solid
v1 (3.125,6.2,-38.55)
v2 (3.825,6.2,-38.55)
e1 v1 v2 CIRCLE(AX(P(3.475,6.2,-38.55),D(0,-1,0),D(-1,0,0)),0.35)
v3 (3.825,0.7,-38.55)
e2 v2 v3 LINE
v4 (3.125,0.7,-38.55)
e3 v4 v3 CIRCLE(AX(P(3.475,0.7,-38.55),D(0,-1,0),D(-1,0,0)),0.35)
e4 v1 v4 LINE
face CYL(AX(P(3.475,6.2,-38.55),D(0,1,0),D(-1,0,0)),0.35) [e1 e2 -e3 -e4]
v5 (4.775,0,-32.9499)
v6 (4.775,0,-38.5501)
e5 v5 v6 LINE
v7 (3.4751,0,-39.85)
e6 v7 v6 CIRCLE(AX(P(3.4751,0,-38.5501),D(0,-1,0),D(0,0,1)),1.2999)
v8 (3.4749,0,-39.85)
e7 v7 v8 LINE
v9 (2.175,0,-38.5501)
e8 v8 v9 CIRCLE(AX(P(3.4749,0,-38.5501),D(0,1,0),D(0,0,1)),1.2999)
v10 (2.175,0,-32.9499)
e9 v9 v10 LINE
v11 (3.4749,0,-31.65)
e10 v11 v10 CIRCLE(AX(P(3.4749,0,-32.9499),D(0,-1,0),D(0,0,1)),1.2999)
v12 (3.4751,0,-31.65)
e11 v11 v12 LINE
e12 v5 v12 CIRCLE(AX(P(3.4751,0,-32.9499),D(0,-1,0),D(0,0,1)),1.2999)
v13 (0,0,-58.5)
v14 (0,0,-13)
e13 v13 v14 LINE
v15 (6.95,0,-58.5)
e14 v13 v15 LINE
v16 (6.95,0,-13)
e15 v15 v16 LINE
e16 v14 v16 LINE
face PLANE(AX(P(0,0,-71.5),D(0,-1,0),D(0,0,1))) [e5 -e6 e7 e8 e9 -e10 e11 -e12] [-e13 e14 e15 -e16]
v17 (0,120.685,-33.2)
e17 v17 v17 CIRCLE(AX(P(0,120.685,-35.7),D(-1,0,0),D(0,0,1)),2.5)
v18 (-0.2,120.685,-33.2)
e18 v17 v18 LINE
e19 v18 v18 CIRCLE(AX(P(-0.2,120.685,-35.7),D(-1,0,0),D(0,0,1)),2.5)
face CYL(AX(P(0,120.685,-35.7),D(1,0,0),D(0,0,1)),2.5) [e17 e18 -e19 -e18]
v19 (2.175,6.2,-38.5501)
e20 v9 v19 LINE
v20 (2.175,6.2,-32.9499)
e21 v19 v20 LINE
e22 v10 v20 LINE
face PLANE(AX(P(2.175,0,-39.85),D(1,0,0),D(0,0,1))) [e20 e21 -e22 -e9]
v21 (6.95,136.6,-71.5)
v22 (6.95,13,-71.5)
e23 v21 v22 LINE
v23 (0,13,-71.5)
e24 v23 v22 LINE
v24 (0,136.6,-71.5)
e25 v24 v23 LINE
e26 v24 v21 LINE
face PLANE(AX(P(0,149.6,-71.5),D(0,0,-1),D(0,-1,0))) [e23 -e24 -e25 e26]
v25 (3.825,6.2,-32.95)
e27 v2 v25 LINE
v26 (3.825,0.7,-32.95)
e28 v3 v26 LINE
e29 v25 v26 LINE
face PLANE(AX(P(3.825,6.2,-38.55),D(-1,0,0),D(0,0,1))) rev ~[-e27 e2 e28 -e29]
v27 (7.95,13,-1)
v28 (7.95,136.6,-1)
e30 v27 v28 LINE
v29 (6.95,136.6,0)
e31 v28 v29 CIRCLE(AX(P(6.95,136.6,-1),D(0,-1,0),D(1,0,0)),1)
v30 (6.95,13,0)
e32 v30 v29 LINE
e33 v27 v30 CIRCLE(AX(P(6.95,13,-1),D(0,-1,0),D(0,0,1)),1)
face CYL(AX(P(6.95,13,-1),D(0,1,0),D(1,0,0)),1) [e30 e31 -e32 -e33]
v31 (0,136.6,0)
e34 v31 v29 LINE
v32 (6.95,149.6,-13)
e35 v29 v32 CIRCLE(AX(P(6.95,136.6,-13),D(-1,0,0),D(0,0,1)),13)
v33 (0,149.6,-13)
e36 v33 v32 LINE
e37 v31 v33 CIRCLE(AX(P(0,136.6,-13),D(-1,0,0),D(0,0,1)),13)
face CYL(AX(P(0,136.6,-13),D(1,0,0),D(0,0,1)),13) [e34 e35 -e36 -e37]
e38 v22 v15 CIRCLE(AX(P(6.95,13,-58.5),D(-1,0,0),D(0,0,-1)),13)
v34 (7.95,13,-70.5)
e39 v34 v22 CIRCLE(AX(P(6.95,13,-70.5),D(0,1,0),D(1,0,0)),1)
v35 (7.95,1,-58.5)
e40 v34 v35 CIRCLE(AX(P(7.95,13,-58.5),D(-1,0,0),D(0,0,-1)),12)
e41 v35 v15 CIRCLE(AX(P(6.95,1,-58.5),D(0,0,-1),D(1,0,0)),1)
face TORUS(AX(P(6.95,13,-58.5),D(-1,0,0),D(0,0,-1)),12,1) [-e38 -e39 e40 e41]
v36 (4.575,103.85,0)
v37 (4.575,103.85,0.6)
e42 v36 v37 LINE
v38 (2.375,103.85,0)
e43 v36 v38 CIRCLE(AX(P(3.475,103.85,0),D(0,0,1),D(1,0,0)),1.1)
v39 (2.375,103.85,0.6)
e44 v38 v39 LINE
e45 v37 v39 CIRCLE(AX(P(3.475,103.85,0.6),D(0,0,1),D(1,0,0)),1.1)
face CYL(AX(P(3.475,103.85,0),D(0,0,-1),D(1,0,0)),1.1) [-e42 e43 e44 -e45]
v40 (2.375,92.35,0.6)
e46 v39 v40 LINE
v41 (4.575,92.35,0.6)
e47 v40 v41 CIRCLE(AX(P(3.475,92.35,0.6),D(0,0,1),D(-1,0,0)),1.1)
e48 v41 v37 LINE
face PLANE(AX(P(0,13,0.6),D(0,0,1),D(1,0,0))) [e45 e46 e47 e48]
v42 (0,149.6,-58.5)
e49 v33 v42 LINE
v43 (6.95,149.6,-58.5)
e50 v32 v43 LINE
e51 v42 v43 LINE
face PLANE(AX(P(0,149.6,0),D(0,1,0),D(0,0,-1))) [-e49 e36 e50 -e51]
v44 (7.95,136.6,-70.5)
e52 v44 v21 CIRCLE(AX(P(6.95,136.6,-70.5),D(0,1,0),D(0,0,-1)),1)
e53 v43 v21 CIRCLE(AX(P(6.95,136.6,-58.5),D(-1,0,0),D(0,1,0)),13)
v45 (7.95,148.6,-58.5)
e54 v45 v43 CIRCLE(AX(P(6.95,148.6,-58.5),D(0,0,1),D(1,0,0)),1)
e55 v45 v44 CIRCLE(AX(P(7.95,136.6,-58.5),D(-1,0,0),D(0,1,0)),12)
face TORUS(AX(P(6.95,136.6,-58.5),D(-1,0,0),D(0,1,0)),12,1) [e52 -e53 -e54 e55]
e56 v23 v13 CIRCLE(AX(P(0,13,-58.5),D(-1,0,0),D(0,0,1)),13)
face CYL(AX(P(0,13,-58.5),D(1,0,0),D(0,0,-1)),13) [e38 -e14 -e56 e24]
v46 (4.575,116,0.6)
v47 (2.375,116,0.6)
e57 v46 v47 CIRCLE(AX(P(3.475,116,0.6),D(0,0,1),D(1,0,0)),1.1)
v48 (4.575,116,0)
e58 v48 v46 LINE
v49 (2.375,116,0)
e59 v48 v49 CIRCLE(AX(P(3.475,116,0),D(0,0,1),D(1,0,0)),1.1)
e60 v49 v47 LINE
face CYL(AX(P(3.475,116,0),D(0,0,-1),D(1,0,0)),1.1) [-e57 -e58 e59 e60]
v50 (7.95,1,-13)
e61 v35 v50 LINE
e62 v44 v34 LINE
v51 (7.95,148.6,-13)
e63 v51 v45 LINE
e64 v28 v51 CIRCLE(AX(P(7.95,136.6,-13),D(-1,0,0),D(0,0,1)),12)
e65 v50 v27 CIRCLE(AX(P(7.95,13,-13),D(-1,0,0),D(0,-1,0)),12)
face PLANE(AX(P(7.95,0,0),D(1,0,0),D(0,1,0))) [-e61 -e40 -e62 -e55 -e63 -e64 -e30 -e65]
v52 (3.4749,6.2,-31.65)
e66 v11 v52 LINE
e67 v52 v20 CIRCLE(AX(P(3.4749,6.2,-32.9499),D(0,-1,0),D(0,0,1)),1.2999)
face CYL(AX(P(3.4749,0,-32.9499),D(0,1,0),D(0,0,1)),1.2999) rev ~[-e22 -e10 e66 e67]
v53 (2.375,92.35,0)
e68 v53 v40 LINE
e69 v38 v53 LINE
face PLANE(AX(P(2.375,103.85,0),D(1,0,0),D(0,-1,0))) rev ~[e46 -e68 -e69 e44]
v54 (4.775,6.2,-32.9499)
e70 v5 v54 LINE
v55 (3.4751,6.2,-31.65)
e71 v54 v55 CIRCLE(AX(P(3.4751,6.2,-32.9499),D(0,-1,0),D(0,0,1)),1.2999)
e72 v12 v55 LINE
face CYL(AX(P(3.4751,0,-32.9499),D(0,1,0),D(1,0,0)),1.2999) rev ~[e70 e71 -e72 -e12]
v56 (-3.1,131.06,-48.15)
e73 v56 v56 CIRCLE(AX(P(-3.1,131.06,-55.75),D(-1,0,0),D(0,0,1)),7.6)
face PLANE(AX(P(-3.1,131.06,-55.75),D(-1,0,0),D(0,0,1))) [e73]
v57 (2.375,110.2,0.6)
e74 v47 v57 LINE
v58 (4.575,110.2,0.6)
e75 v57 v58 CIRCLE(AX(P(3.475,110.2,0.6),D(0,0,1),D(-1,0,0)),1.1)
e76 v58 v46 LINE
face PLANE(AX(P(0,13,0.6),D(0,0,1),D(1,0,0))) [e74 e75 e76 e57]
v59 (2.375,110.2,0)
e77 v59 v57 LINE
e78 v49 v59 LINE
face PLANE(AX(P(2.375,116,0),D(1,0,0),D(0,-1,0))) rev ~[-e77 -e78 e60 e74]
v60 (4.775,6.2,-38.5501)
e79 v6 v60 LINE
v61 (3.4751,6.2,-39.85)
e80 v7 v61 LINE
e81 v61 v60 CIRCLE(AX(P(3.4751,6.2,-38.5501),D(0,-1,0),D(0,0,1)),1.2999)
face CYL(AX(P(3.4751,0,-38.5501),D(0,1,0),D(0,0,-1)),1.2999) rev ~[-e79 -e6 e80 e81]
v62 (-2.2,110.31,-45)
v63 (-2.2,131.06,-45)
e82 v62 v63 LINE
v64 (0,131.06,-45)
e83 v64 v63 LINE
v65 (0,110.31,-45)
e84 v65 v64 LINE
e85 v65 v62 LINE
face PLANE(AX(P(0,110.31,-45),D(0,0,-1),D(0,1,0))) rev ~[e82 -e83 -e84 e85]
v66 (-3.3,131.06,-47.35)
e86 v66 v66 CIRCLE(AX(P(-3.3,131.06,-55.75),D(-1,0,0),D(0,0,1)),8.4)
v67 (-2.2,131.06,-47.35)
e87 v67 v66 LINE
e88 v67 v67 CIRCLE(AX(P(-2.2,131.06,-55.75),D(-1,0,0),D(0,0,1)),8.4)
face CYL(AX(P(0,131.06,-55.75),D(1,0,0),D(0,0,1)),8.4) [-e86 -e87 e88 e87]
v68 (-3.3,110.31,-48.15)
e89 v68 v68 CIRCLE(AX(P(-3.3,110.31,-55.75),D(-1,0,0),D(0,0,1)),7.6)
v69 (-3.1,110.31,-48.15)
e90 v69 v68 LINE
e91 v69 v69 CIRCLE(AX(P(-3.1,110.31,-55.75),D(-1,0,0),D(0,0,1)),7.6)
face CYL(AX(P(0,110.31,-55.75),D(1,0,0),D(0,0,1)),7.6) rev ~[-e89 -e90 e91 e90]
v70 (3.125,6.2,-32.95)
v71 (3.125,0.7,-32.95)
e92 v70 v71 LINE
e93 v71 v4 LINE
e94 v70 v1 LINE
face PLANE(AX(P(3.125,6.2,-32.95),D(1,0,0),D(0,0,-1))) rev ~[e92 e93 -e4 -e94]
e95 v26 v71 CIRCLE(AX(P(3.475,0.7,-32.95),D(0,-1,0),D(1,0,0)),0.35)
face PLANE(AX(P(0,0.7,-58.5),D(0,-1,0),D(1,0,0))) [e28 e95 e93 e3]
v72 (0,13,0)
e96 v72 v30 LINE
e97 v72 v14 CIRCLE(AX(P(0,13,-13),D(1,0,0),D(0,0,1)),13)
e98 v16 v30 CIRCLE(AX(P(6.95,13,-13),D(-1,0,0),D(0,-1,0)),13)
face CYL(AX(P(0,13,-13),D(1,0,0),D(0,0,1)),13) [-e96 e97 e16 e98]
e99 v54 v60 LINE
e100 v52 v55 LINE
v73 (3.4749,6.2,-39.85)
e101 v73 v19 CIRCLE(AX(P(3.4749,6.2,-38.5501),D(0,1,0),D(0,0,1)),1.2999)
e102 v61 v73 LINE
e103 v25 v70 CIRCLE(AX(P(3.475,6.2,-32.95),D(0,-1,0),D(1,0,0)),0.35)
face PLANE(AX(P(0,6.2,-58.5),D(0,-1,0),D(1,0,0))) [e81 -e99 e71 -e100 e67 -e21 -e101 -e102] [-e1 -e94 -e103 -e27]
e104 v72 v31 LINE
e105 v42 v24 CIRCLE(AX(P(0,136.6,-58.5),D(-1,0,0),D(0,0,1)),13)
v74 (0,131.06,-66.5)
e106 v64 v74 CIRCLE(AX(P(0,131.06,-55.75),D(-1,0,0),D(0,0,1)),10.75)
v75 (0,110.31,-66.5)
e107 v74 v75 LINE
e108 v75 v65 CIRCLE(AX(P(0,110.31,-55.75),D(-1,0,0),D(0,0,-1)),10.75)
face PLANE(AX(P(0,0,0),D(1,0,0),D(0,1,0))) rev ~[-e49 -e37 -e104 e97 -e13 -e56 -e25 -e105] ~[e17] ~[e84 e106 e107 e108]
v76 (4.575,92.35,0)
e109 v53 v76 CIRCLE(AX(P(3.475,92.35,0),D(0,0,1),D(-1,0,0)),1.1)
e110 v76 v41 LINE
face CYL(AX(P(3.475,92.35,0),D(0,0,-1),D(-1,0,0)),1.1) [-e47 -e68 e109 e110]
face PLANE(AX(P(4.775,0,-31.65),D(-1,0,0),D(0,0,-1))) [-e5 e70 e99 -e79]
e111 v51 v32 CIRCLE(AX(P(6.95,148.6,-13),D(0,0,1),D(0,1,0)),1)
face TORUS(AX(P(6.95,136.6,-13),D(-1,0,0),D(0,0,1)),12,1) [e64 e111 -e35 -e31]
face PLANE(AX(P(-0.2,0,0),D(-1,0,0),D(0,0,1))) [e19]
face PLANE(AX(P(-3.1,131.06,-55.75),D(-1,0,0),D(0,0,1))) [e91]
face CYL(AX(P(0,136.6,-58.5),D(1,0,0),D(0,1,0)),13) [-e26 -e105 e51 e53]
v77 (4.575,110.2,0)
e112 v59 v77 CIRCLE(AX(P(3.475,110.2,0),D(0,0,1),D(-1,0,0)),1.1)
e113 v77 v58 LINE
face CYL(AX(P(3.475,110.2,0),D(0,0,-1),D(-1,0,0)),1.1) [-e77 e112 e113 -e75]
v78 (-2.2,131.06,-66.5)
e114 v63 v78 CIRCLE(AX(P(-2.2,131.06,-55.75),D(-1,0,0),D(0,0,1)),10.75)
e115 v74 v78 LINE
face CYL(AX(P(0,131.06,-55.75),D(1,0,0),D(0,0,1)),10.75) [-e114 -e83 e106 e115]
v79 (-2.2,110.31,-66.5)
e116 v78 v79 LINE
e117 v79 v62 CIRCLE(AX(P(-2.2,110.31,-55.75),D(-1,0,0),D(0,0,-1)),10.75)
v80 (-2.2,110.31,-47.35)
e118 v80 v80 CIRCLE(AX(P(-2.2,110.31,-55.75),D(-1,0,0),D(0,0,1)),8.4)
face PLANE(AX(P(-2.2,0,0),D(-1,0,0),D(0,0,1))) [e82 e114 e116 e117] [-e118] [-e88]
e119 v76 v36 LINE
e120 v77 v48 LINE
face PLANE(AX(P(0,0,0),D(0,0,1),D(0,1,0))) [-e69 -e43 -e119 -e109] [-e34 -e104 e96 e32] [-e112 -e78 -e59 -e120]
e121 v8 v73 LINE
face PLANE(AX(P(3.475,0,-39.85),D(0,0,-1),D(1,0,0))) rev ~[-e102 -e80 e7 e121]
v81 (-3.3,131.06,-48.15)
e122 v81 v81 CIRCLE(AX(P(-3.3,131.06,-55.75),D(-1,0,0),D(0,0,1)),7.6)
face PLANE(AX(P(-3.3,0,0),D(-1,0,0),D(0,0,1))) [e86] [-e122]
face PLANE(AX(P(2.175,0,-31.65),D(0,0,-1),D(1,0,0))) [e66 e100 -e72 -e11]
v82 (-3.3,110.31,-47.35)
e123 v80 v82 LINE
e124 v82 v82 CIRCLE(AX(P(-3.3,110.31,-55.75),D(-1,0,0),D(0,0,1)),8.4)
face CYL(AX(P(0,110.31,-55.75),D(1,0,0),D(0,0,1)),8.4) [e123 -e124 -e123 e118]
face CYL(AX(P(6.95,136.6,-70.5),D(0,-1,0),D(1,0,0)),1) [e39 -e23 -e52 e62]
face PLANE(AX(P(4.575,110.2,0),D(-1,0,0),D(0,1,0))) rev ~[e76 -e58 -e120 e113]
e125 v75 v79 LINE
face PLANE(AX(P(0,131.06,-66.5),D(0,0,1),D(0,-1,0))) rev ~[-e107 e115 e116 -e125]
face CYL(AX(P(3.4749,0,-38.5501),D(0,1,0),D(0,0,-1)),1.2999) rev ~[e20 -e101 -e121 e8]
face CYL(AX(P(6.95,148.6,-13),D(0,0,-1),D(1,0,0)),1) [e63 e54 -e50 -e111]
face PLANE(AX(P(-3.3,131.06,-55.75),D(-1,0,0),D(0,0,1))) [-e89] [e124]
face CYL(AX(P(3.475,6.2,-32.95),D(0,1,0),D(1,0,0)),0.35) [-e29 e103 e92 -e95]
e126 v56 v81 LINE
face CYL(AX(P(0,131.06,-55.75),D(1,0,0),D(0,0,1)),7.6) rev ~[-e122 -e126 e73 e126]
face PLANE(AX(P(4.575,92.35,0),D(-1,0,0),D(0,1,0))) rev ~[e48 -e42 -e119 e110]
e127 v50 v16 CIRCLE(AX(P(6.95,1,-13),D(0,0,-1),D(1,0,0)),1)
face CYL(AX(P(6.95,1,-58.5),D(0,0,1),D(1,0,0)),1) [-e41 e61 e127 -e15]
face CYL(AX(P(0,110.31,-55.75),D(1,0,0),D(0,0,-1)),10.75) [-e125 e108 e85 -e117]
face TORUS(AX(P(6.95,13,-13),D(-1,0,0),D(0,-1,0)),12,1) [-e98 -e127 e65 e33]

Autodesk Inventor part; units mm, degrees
ref_plane "YZ Plane" through (0, 0, 0) normal (1, 0, 0) x (0, 1, 0)
ref_plane "XZ Plane" through (0, 0, 0) normal (0, 1, 0) x (-1, 0, 0)
ref_plane "XY Plane" through (0, 0, 0) normal (0, 0, 1) x (1, 0, 0)
sketch "Esboço1" plane through (0, 0, 0) normal (1, 0, 0) x (0, 1, 0)
  line L0 (0, 0) -> (149.6, 0)
  line L1 (149.6, 0) -> (149.6, -71.5)
  line L2 (149.6, -71.5) -> (0, -71.5)
  line L3 (0, -71.5) -> (0, 0)
  dimension "d0" = 149.6
  dimension "d1" = 71.5
extrude "Extrusão1" add sketch "Esboço1" along normal blind 7.95
fillet "Arredondamento1" radius 13 4 edges at (3.975, 149.6, -71.5) (3.975, 149.6, 0) (3.975, 0, 0) (3.975, 0, -71.5)
fillet "Arredondamento2" radius 1 8 edges at (7.95, 0, -35.75) (7.95, 3.8076, -67.6924) (7.95, 74.8, -71.5) (7.95, 145.7924, -67.6924) (7.95, 149.6, -35.75) (7.95, 145.7924, -3.8076) (7.95, 74.8, 0) (7.95, 3.8076, -3.8076)
sketch "Esboço2" plane through (0, 0, -58.5) normal (0, -1, 0) x (1, 0, 0)
  line L0 (6.95, 0) -> (0, 0) projected
  line L1 (0, 45.5) -> (6.95, 45.5) projected
  line L2 (3.475, 18.65) -> (4.775, 18.65)
  line L3 (4.775, 18.65) -> (2.175, 18.65)
  line L4 (2.175, 18.65) -> (2.175, 26.85)
  line L5 (2.175, 26.85) -> (4.775, 26.85)
  line L6 (4.775, 26.85) -> (4.775, 18.65)
  point P0 (0, 58.5)
extrude "Extrusão2" cut sketch "Esboço2" against normal blind 6.2
fillet "Arredondamento3" radius 1.3 4 edges at (4.775, 3.1, -39.85) (2.175, 3.1, -39.85) (4.775, 3.1, -31.65) (2.175, 3.1, -31.65)
sketch "Esboço3" plane through (0, 6.2, -58.5) normal (0, -1, 0) x (1, 0, 0)
  arc A0 (4.775, 25.55) -> (2.175, 25.55) centre (3.475, 25.55) ccw projected
  arc A1 (2.175, 19.95) -> (4.775, 19.95) centre (3.475, 19.95) ccw projected
  line L0 (3.475, 25.55) -> (3.475, 19.95) construction
  line L1 (3.125, 25.55) -> (3.125, 19.95)
  line L2 (3.825, 19.95) -> (3.825, 25.55)
  arc A2 (3.825, 25.55) -> (3.125, 25.55) centre (3.475, 25.55) ccw
  arc A3 (3.125, 19.95) -> (3.825, 19.95) centre (3.475, 19.95) ccw
  point P0 (0, 58.5)
  point P1 (3.475, 22.75)
extrude "Extrusão3" add sketch "Esboço3" along normal blind 5.5
sketch "Esboço4" plane through (0, 0, 0) normal (-1, 0, 0) x (0, 0, 1)
  line L0 (-58.5, 149.6) -> (-13, 149.6) projected
  arc A0 (-58.5, 148.6) -> (-70.5, 136.6) centre (-58.5, 136.6) ccw projected
  line L1 (-66.5, 131.06) -> (-66.5, 110.31)
  line L2 (-45, 110.31) -> (-45, 131.06)
  arc A1 (-45, 131.06) -> (-66.5, 131.06) centre (-55.75, 131.06) ccw
  arc A2 (-66.5, 110.31) -> (-45, 110.31) centre (-55.75, 110.31) ccw
  circle A3 centre (-55.75, 131.06) radius 8.4
  circle A4 centre (-55.75, 131.06) radius 7.6
  circle A5 centre (-55.75, 131.06) radius 5.75
  circle A6 centre (-55.75, 110.31) radius 8.4
  circle A7 centre (-55.75, 110.31) radius 7.6
  circle A8 centre (-55.75, 110.31) radius 5.75
  point P0 (0, 0)
extrude "Extrusão4" add sketch "Esboço4" along normal blind 2.2 contours A1 L2 A2 L1
sketch "Esboço5" plane through (0, 0, 0) normal (-1, 0, 0) x (0, 0, 1)
  circle A0 centre (-55.75, 131.06) radius 8.4 projected
  circle A1 centre (-55.75, 131.06) radius 7.6
  circle A2 centre (-55.75, 131.06) radius 5.75
  circle A3 centre (-55.75, 131.06) radius 8.4
  point P0 (0, 0)
extrude "Extrusão5" add sketch "Esboço5" along normal blind 3.3 contours A0
sketch "Esboço6" plane through (0, 131.06, -55.75) normal (-1, 0, 0) x (0, 0, 1)
  circle A0 centre (0, -20.75) radius 8.4 projected
  circle A1 centre (0, -20.75) radius 8.4
  circle A2 centre (0, -20.75) radius 7.6
  point P0 (55.75, -131.06)
extrude "Extrusão6" add sketch "Esboço6" along normal blind 3.3
sketch "Esboço7" plane through (0, 131.06, -55.75) normal (-1, 0, 0) x (0, 0, 1)
  circle A0 centre (0, 0) radius 7.6
  circle A1 centre (0, -20.75) radius 7.6 projected
  circle A2 centre (0, -20.75) radius 7.6
  point P0 (55.75, -131.06)
  dimension "d38" = 15.2
  dimension "d40" = 15.2
extrude "Extrusão7" add sketch "Esboço7" along normal blind 3.1
sketch "Esboço8" plane through (0, 0, 0) normal (-1, 0, 0) x (0, 0, 1)
  line L0 (-45, 110.31) -> (-45, 131.06) projected
  circle A0 centre (-35.7, 120.685) radius 2.5
  circle A1 centre (-35.7, 120.685) radius 2.3
  point P0 (0, 0)
  dimension "d45" = 4.6
extrude "Extrusão8" add sketch "Esboço8" along normal blind 0.2 contours A0 | A1
sketch "Esboço9" plane through (0, 13, 0) normal (0, 0, 1) x (1, 0, 0)
  line L0 (0, 136.6) -> (6.95, 136.6) projected
  line L1 (2.375, 103) -> (2.375, 97.2)
  line L2 (4.575, 97.2) -> (4.575, 103)
  arc A0 (4.575, 103) -> (2.375, 103) centre (3.475, 103) ccw
  arc A1 (2.375, 97.2) -> (4.575, 97.2) centre (3.475, 97.2) ccw
  line L3 (3.475, 79.35) -> (3.475, 90.85) construction
  line L4 (4.575, 79.35) -> (4.575, 90.85)
  line L5 (2.375, 90.85) -> (2.375, 79.35)
  arc A2 (2.375, 79.35) -> (4.575, 79.35) centre (3.475, 79.35) ccw
  arc A3 (4.575, 90.85) -> (2.375, 90.85) centre (3.475, 90.85) ccw
  point P0 (0, -13)
sketch "Esboço10" plane through (0, 13, 0) normal (0, 0, 1) x (1, 0, 0)
  line L0 (3.4735, 64.3614) -> (3.4735, 75.8614) construction
  line L1 (4.5735, 64.3614) -> (4.5735, 75.8614)
  line L2 (2.3735, 75.8614) -> (2.3735, 64.3614)
  arc A0 (2.3735, 64.3614) -> (4.5735, 64.3614) centre (3.4735, 64.3614) ccw
  arc A1 (4.5735, 75.8614) -> (2.3735, 75.8614) centre (3.4735, 75.8614) ccw
  point P0 (0, -13)
extrude "Extrusão9" add sketch "Esboço9" along normal blind 0.6
